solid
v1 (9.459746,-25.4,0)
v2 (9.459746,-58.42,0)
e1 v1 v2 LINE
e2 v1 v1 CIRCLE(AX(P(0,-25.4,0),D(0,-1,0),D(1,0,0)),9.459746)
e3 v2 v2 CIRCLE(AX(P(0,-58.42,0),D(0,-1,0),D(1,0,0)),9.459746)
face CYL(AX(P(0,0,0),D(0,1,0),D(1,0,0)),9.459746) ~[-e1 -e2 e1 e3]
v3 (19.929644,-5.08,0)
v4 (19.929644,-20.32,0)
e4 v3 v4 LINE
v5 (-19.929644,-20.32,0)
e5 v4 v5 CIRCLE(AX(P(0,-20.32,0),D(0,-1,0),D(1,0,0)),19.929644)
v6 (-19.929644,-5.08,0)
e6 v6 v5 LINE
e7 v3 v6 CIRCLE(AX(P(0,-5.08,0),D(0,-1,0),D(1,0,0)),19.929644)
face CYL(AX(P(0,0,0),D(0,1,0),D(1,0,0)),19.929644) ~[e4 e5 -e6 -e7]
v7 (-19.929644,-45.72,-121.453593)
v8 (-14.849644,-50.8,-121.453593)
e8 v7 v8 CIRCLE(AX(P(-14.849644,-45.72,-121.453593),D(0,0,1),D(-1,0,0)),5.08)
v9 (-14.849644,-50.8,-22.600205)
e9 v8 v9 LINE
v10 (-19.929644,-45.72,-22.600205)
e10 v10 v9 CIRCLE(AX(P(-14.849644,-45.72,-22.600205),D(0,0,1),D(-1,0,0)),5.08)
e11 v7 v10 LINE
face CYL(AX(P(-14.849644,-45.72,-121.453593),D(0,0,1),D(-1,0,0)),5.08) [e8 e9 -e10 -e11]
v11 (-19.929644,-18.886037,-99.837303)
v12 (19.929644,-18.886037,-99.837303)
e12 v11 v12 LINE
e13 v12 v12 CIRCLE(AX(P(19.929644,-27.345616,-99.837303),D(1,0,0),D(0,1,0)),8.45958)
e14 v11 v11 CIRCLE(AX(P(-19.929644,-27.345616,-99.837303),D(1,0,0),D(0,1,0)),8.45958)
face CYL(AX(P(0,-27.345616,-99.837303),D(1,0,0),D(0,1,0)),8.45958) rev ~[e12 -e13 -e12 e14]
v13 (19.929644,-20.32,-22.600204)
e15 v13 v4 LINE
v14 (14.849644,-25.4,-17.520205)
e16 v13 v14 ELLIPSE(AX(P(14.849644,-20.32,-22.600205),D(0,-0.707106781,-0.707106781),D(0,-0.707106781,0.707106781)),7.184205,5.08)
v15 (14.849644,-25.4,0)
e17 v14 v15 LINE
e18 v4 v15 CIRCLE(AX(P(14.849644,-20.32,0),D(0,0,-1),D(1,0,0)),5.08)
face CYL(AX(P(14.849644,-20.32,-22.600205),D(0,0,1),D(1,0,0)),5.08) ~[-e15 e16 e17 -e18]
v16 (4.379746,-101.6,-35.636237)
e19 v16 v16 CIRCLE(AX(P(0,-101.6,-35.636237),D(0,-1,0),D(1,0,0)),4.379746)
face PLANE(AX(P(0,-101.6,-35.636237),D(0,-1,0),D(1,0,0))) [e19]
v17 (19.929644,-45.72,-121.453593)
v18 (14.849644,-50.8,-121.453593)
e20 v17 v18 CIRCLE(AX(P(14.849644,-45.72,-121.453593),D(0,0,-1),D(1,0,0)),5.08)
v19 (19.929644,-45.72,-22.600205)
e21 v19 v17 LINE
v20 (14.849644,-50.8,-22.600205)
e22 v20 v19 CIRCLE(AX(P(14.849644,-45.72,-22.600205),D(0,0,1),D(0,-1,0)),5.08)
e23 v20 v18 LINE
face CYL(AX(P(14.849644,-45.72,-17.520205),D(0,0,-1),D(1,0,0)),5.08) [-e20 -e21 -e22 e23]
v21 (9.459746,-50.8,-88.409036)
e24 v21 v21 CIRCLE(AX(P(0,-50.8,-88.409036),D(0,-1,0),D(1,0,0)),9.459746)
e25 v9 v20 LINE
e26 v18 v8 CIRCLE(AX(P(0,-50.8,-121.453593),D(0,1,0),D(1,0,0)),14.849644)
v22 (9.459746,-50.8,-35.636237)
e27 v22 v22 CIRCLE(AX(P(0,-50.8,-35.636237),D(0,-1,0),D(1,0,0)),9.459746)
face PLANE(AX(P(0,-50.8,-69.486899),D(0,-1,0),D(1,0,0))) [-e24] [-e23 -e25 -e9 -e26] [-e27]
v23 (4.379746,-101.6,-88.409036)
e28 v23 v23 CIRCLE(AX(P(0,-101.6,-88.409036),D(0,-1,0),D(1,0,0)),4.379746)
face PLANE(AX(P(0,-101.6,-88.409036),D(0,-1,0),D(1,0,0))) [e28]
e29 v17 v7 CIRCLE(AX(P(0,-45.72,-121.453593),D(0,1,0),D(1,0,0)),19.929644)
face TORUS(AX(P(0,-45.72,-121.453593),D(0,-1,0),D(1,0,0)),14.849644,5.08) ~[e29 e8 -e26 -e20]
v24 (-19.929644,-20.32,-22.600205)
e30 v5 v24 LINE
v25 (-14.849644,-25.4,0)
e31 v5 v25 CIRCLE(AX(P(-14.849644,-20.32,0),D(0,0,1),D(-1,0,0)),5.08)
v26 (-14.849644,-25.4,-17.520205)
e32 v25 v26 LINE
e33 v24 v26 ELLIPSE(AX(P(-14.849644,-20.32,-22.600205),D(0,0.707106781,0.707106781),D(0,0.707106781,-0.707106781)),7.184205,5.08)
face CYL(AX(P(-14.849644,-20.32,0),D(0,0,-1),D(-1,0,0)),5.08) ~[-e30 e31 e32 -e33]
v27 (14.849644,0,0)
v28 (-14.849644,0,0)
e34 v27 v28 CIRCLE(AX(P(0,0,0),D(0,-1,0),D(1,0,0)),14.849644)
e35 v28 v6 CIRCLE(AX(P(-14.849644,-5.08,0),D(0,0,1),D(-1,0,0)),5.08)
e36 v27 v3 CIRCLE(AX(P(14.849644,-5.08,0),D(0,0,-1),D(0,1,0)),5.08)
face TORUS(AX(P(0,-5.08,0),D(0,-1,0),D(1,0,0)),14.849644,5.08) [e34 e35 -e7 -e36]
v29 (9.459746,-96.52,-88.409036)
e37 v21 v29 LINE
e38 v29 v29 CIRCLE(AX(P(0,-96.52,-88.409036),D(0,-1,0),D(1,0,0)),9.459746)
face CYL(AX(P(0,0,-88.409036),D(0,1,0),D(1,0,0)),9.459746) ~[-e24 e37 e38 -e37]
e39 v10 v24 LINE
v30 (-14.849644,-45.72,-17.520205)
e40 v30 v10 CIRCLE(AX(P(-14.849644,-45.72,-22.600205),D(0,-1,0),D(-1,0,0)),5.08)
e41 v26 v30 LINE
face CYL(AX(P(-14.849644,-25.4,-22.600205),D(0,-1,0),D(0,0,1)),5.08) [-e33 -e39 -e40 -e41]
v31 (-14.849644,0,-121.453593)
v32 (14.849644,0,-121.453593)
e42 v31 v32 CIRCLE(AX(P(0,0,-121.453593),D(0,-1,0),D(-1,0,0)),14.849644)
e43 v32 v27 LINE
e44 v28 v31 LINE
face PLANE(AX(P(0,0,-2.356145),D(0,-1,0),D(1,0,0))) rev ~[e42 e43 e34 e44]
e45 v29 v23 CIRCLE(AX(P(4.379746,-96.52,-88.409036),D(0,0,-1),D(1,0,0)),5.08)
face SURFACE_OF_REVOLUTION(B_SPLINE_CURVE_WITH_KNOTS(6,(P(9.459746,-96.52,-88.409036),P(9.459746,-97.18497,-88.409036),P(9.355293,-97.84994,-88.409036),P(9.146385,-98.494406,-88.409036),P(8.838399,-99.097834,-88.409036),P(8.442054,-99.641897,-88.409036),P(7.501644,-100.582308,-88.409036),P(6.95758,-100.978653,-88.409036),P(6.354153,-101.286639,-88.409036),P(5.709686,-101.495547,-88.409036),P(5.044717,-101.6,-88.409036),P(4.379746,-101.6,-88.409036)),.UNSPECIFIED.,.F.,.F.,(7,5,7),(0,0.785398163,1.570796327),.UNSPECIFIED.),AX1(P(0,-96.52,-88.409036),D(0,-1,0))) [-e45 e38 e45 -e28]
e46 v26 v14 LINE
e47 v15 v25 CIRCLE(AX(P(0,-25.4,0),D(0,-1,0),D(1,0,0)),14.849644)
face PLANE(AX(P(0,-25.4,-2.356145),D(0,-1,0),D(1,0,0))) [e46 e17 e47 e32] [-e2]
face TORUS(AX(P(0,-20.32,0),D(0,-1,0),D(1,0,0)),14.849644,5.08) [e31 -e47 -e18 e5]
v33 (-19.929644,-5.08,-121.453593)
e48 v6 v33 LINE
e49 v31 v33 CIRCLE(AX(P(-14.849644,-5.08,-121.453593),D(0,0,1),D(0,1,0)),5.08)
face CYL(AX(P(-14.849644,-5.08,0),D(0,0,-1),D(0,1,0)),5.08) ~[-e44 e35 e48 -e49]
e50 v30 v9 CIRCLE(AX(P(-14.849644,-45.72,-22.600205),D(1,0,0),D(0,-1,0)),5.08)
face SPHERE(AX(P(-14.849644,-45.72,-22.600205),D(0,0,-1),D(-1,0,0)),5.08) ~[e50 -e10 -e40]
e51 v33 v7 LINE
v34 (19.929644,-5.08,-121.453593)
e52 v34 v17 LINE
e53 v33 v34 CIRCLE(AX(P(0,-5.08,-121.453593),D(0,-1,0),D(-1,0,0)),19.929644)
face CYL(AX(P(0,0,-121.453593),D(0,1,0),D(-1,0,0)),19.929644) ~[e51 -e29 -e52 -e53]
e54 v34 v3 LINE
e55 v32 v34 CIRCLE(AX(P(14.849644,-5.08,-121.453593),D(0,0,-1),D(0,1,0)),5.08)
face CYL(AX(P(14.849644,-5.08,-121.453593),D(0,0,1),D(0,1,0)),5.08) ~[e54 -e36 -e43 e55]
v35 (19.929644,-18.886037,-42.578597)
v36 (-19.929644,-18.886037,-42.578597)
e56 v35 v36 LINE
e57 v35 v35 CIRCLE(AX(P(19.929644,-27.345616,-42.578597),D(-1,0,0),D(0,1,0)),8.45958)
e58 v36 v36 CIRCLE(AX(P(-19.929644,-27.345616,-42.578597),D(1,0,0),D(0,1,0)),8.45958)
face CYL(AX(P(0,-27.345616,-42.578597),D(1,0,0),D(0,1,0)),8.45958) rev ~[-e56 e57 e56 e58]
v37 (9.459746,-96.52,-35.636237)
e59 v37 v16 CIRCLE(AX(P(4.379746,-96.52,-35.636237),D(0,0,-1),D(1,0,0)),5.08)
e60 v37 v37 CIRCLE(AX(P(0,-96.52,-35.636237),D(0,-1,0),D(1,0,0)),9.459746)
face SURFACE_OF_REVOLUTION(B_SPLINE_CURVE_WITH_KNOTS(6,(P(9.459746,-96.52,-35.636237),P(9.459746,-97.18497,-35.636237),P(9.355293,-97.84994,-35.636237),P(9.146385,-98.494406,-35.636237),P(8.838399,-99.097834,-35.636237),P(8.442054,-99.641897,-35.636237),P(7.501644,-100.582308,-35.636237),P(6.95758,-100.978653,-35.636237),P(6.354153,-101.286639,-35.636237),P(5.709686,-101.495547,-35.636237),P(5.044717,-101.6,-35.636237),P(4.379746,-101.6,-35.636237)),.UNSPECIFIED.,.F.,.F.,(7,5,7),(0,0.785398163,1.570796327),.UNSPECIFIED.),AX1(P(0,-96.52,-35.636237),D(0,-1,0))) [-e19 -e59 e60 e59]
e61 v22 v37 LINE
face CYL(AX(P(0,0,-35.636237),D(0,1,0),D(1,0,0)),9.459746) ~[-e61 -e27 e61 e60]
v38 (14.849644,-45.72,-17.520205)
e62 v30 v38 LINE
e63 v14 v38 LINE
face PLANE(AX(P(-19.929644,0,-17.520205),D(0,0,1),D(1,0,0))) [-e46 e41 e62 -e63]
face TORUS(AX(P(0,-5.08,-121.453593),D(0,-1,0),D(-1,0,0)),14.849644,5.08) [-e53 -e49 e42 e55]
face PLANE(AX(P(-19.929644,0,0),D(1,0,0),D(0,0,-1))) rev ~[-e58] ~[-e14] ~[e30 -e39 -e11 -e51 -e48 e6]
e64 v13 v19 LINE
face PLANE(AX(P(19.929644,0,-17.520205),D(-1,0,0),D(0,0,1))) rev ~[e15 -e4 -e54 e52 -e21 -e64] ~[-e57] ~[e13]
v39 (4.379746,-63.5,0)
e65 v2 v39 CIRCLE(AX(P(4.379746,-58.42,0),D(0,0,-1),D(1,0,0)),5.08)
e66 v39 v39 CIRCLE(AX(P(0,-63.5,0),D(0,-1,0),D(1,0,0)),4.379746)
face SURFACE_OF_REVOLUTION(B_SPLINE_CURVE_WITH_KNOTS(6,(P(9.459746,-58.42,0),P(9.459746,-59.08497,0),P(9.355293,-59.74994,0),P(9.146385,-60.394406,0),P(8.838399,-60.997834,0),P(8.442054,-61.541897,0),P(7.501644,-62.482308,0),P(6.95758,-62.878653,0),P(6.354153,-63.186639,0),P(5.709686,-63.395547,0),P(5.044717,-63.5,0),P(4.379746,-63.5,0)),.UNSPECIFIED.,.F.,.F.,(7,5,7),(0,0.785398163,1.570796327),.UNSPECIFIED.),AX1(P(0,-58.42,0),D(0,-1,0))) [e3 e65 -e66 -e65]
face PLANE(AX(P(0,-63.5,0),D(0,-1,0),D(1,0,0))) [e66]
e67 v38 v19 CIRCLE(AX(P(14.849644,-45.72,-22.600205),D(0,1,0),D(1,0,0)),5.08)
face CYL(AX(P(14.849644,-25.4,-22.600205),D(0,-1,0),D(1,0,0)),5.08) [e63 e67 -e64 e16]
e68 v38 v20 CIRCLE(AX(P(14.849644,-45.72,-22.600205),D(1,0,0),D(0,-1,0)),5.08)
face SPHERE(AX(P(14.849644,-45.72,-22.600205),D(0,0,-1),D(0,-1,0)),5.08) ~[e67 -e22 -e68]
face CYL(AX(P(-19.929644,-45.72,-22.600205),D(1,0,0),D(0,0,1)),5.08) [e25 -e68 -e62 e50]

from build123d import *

# Parameters (mm, degrees)
F0_R     = 9.4597461698
F1_DEPTH = 101.6
F0_W     = 39.8592872384
F0_H     = 103.9333879682
F2_DEPTH = 50.8
F3_DEPTH = 25.4
F4_DEPTH = 63.5
F5_R     = 5.08
F6_R     = 5.08
F7_R     = 5.08
F8_R     = 8.4595796919
F9_DEPTH = 25.4
F12_R    = 5.08


# Not quite as in the source:
# - the program builds the solid bodies; features that only make, move or delete a surface that nothing else refers to are left out


with BuildPart() as f1:
    # F0 (on Front) → F1 (new body)
    with BuildSketch(Plane.XZ):
        with Locations((0, -35.6362370717)):
            Circle(F0_R)
    extrude(amount=F1_DEPTH)



with BuildPart() as f1b:
    # F0 (on Front) → F1, piece 2 (new body)
    with BuildSketch(Plane.XZ):
        with Locations((0, -88.4090361273)):
            Circle(F0_R)
    extrude(amount=F1_DEPTH)


with BuildPart() as f1_1:
    add(f1.part)

    add(f1b.part)  # F2 merges F1b
    # F0 (on Front) → F2 (join)
    with BuildSketch(Plane.XZ):
        with Locations((0, -69.4868988952)):
            Rectangle(F0_W, F0_H)
        with Locations((0, -88.4090361273)):
            Circle(F0_R, mode=Mode.SUBTRACT)
        with Locations((0, -35.6362370717)):
            Circle(F0_R, mode=Mode.SUBTRACT)
        with BuildLine():
            ThreePointArc((-19.9296436192, -121.4535928793), (0, -141.3832364985), (19.9296436192, -121.4535928793))
            Line((19.9296436192, -121.4535928793), (-19.9296436192, -121.4535928793))
        make_face()
    extrude(amount=F2_DEPTH)

    # F0 (on Front) → F3 (join)
    with BuildSketch(Plane.XZ):
        with BuildLine():
            Line((19.9296436192, -17.5202049111), (19.9296436192, 0))
            ThreePointArc((19.9296436192, 0), (0, 19.9296436192), (-19.9296436192, 0))
            Line((-19.9296436192, 0), (-19.9296436192, -17.5202049111))
            Line((-19.9296436192, -17.5202049111), (19.9296436192, -17.5202049111))
        make_face()
        Circle(F0_R, mode=Mode.SUBTRACT)
    extrude(amount=F3_DEPTH)

    # F0 (on Front) → F4 (join)
    with BuildSketch(Plane.XZ):
        Circle(F0_R)
    extrude(amount=F4_DEPTH)

    # F5
    f5_edges = [f1_1.edges().sort_by_distance(p)[0] for p in [
        (-19.929644, -50.8, -69.486899),
        (-19.929644, -38.1, -17.520205),
        (19.929644, -50.8, -69.486899),
        (0, -50.8, -17.520205),
        (19.929644, -38.1, -17.520205),
    ]]
    fillet(f5_edges, radius=F5_R)

    # F6
    f6_edges = [f1_1.edges().sort_by_distance(p)[0] for p in [
        (19.929644, 0, -60.726796),
        (0, 0, 19.929644),
        (-19.929644, 0, -60.726796),
        (0, 0, -141.383236),
    ]]
    fillet(f6_edges, radius=F6_R)

    # F7
    f7_edges = [f1_1.edges().sort_by_distance(p)[0] for p in [
        (-19.929644, -25.4, -8.760102),
        (-19.929644, -25.4, -20.060205),
        (0, -25.4, 19.929644),
        (19.929644, -15.24, 0),
    ]]
    fillet(f7_edges, radius=F7_R)

    # F8 (on Right) → F9 (cut, symmetric)
    with BuildSketch(Plane.YZ):
        with Locations((-27.3456163704, -42.5785966218)):
            Circle(F8_R)
        with Locations((-27.3456163704, -99.8373031616)):
            Circle(F8_R)
    extrude(amount=F9_DEPTH, both=True, mode=Mode.SUBTRACT)

    # F12
    f12_edges = [f1_1.edges().sort_by_distance(p)[0] for p in [
        (-9.459746, -101.6, -88.409036),
        (-9.459746, -101.6, -35.636237),
        (-9.459746, -63.5, 0),
    ]]
    fillet(f12_edges, radius=F12_R)


solid = f1_1.part
